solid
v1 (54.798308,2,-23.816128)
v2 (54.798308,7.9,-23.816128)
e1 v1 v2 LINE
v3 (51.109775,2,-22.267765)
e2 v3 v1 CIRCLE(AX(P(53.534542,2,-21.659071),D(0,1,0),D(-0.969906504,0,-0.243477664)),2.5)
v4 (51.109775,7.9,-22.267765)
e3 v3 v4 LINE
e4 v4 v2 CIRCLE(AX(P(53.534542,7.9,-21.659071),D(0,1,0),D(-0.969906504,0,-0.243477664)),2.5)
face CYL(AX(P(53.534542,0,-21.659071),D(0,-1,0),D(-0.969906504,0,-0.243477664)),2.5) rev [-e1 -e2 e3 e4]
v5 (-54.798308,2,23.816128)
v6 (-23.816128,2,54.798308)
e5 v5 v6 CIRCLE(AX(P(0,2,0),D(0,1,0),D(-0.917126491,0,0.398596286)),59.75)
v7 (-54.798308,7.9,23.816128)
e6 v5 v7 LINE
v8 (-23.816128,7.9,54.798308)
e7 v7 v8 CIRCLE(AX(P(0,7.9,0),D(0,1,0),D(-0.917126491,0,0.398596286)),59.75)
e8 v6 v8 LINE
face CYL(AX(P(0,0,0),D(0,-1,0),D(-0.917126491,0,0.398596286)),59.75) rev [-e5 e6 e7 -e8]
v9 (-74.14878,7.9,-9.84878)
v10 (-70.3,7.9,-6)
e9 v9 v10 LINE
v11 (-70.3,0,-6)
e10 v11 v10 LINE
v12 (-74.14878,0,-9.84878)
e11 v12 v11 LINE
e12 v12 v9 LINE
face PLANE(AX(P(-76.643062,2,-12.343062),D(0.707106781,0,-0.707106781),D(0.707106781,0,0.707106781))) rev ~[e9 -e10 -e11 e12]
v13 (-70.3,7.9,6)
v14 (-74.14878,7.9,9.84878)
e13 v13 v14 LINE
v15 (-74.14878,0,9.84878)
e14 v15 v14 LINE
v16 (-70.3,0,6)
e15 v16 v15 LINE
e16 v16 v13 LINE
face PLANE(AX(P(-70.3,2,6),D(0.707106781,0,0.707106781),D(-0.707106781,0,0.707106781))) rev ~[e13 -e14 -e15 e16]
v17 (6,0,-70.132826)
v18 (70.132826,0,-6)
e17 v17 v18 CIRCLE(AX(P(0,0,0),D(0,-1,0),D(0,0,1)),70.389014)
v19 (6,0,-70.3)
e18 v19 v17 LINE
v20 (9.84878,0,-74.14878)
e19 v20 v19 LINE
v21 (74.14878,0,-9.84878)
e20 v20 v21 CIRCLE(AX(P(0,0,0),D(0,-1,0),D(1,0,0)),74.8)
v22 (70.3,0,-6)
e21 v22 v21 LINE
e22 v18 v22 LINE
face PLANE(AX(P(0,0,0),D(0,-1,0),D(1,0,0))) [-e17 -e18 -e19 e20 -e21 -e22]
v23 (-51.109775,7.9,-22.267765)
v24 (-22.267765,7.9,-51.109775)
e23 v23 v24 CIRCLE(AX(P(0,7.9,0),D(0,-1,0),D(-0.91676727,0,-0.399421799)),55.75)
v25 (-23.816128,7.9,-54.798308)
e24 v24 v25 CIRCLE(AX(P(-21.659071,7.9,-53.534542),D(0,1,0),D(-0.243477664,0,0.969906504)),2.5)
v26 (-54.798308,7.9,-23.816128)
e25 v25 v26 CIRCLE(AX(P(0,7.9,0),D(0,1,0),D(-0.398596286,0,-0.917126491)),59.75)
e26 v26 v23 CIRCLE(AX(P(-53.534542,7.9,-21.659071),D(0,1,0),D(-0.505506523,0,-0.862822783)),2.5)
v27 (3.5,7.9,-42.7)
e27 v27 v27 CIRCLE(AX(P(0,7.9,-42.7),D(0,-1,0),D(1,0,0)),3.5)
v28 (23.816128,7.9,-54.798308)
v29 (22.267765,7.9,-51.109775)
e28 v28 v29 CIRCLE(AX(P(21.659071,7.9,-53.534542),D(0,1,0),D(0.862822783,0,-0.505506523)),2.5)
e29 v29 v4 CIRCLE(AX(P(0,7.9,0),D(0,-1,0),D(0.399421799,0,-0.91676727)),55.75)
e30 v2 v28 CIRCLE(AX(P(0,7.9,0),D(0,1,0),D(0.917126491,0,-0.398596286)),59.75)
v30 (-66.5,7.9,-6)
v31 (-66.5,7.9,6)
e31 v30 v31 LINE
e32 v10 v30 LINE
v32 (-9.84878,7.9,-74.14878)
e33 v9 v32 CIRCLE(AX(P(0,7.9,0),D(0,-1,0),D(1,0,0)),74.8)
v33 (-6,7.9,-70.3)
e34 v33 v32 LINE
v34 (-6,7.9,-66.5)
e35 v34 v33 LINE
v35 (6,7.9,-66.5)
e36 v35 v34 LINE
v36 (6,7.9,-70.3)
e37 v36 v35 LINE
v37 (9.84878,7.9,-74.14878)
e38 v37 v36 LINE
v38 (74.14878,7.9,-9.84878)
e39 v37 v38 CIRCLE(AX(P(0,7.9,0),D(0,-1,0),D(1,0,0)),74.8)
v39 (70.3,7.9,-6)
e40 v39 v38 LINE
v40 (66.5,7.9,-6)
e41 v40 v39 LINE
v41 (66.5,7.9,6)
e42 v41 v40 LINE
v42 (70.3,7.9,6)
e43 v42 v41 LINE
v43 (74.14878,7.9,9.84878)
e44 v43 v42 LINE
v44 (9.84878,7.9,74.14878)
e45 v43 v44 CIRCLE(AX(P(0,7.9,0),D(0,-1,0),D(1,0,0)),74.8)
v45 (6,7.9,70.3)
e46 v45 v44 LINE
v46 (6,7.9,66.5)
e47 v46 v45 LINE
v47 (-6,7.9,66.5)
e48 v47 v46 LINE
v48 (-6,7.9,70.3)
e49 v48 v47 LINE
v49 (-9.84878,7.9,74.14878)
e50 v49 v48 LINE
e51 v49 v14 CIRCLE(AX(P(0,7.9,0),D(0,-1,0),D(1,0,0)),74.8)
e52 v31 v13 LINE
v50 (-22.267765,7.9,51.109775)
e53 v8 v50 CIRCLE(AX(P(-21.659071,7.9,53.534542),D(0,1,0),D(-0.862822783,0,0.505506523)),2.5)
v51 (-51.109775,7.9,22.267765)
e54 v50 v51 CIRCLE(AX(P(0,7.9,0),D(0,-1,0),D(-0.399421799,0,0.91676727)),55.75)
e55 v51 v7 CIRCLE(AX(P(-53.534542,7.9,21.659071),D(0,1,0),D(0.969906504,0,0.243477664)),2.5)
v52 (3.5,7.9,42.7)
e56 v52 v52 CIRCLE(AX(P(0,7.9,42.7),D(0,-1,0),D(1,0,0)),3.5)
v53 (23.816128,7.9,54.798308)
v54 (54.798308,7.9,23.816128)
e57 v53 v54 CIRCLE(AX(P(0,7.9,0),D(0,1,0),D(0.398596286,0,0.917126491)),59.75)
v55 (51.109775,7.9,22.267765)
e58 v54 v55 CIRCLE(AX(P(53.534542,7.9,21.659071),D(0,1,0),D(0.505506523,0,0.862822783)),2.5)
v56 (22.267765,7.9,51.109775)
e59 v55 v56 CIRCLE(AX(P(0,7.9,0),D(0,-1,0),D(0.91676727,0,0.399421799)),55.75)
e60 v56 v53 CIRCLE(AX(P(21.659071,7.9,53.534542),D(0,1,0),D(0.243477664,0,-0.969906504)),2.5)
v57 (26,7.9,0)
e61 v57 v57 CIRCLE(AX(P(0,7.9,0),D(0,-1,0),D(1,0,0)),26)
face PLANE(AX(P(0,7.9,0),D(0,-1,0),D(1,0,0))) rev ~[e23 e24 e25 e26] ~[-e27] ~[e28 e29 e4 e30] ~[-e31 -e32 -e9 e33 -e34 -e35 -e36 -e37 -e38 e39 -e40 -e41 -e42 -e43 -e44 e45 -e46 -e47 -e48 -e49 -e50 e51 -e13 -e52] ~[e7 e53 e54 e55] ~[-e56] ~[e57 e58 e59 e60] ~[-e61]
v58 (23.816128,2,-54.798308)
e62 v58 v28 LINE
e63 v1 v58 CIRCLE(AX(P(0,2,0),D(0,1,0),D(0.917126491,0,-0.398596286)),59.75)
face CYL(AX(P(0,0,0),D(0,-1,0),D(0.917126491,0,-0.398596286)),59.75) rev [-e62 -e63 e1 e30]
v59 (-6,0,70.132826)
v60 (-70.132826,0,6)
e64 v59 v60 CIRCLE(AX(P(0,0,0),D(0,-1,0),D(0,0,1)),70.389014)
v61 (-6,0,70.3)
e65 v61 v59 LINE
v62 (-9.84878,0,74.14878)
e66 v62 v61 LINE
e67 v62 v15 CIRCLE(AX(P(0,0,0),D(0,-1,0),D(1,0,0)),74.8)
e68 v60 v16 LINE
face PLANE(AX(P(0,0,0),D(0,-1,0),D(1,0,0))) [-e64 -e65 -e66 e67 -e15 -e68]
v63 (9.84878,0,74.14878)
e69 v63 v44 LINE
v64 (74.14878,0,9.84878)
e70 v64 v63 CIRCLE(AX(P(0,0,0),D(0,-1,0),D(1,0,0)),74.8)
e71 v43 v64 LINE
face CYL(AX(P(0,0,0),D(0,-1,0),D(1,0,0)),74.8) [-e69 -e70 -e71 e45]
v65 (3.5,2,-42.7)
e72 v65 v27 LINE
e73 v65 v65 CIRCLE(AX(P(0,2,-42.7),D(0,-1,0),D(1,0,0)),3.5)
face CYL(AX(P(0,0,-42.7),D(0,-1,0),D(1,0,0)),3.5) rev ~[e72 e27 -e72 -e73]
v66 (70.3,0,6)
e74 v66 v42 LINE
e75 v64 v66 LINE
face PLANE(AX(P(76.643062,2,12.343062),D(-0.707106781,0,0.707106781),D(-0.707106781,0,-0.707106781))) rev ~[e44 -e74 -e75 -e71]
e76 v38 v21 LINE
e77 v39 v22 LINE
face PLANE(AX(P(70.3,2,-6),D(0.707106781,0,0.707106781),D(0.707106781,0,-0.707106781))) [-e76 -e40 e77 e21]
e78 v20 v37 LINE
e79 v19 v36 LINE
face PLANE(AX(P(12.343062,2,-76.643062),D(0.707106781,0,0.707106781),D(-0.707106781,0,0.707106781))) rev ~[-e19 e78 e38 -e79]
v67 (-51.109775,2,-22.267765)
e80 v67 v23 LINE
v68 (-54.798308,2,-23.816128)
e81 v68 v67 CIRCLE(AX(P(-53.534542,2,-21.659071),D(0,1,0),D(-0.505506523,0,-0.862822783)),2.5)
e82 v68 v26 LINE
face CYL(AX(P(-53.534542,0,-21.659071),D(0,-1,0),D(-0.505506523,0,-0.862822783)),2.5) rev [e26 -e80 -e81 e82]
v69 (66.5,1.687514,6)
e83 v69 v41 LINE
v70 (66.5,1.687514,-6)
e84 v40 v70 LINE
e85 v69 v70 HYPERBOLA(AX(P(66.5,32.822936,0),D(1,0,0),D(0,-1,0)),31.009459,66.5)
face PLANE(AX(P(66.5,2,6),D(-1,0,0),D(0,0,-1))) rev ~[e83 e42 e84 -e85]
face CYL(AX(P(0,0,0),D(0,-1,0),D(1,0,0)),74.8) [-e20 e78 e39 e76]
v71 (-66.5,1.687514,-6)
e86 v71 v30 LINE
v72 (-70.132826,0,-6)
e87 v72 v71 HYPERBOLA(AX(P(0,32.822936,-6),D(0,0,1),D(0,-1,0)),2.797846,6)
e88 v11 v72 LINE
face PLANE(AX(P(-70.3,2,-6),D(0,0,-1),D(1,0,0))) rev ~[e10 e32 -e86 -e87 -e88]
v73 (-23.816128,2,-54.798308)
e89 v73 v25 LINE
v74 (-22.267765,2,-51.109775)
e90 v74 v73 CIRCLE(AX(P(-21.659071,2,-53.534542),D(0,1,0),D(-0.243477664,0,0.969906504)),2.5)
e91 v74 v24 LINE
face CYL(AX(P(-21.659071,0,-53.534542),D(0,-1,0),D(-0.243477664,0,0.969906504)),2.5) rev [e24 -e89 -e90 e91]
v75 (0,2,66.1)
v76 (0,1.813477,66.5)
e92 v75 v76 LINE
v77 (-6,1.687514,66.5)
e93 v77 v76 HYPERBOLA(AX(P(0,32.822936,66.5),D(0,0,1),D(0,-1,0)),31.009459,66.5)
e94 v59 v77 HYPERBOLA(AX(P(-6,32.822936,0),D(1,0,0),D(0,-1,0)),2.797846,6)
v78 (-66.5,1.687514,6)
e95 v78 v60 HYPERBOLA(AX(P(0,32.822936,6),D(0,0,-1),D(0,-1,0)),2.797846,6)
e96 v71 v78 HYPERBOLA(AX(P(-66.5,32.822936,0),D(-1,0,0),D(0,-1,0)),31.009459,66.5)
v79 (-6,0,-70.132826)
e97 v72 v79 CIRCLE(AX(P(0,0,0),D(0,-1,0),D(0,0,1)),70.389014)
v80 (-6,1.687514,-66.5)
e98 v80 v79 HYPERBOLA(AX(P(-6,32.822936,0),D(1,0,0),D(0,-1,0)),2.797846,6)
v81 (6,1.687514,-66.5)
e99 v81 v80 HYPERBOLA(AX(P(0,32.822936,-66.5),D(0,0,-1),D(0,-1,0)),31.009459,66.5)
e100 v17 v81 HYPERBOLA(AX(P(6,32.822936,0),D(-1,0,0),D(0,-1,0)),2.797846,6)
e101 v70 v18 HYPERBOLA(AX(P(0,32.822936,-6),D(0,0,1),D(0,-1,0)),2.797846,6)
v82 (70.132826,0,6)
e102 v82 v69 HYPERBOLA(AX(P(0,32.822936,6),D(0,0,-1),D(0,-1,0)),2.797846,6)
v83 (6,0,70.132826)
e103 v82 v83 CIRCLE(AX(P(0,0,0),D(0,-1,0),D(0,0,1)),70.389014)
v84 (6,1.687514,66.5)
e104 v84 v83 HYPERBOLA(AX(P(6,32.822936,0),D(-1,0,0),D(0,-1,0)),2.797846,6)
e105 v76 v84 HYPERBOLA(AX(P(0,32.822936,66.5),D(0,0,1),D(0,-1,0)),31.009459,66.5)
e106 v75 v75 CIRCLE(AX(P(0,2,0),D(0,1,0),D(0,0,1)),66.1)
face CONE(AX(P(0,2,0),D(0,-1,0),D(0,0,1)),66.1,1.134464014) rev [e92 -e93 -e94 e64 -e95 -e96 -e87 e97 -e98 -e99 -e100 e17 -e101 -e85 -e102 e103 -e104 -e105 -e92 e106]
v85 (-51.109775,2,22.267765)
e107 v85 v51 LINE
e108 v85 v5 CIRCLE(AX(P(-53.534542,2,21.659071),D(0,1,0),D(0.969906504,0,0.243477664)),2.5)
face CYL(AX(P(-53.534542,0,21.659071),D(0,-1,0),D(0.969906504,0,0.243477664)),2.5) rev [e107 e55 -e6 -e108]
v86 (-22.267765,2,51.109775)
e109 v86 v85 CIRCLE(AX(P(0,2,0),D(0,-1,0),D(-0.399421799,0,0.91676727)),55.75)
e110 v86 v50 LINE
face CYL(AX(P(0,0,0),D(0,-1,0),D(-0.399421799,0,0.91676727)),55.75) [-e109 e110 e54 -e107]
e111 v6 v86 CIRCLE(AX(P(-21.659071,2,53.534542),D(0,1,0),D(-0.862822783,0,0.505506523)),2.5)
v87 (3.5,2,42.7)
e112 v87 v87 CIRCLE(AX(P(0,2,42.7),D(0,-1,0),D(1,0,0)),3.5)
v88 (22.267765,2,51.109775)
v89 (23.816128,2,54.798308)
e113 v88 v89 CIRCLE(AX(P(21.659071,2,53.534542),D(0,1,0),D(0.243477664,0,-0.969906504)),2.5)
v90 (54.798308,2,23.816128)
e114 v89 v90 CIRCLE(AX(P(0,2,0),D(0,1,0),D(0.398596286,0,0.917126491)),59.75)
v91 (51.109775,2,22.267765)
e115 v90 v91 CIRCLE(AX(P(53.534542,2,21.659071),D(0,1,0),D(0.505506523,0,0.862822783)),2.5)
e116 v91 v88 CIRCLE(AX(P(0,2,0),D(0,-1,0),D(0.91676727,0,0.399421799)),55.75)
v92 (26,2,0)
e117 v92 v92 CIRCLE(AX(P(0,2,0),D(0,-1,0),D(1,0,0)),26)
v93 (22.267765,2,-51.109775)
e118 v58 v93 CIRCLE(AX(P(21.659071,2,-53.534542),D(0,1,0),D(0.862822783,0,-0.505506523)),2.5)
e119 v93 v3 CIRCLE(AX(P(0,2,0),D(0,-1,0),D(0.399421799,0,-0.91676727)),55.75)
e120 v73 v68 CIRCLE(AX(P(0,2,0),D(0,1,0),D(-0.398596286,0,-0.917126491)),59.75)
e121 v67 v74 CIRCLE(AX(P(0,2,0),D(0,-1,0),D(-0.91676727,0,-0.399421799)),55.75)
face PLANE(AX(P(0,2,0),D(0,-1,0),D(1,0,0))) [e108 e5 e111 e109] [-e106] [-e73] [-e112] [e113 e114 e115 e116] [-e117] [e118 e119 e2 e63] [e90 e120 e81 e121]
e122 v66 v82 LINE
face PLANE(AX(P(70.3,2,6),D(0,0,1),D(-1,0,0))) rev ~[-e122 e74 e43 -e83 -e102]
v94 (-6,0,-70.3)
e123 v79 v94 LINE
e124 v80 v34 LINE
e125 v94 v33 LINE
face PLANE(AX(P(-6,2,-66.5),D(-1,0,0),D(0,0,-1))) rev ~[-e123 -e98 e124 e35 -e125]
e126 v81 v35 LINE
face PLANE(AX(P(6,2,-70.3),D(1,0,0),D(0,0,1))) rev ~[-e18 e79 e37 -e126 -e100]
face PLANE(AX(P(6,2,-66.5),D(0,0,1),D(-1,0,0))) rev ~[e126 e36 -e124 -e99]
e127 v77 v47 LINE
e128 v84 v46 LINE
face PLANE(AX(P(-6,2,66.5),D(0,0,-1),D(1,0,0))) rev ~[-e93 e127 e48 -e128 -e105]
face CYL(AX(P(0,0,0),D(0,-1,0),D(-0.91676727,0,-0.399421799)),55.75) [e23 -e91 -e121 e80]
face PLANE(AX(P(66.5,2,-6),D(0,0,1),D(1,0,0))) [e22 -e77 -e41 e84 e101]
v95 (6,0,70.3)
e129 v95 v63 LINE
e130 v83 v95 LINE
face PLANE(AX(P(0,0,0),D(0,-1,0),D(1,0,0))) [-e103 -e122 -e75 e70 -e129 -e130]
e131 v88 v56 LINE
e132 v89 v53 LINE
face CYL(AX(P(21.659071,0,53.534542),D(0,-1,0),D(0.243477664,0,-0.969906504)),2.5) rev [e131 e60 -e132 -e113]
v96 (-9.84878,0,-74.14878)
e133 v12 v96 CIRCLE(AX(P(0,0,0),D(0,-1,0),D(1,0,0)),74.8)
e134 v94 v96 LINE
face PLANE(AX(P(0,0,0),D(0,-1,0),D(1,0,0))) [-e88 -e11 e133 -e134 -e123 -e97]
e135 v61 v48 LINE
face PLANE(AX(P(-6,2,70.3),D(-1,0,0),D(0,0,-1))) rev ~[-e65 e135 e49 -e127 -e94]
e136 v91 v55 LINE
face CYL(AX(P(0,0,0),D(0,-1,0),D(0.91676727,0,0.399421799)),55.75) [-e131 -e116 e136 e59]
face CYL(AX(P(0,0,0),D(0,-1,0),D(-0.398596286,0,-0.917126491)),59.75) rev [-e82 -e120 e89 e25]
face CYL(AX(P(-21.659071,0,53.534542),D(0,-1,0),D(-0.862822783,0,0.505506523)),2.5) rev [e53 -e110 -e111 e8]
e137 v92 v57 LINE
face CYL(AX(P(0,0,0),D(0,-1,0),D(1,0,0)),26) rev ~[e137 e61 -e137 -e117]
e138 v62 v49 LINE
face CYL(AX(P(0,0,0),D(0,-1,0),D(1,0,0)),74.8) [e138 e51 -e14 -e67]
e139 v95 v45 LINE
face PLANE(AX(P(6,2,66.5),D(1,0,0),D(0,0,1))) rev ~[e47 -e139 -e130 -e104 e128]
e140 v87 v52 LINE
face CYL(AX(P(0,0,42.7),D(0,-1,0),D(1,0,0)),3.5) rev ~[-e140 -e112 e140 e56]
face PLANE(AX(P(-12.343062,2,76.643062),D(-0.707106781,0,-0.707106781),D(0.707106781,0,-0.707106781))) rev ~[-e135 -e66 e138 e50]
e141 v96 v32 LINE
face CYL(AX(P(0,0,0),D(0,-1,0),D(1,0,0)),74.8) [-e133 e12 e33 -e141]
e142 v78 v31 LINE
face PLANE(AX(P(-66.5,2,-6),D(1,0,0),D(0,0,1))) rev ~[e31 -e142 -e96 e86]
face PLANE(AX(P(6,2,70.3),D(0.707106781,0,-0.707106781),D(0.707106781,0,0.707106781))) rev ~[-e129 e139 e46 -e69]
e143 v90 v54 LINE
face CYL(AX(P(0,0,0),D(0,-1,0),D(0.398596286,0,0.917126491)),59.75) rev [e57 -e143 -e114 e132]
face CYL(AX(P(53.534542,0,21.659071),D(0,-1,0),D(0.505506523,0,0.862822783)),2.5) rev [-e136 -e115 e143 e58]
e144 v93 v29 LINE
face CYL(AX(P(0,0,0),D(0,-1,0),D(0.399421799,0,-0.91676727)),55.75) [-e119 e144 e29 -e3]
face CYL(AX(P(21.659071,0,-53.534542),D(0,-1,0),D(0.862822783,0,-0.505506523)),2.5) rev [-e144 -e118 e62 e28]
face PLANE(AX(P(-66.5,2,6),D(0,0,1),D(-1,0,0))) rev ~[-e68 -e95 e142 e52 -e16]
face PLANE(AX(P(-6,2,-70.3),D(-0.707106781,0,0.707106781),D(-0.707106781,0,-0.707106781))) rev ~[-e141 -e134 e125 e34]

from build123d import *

# Parameters (mm, degrees)
F0_R     = 74.8
F0_R_2   = 3.5
F0_R_3   = 26
F1_DEPTH = 7.9
F2_DEPTH = 7.9
F3_R     = 66.1
F3_R_2   = 3.5
F3_R_3   = 26
F4_DEPTH = 2
F8_DEPTH = 5.9
F9_DEPTH = 2


# Not quite as in the source:
# - a feature names something its author has since deleted; it is built from what else it names


with BuildPart() as f1:
    # F0 (on Front) → F1 (new body)
    with BuildSketch(Plane.XZ):
        Circle(F0_R)
        with BuildLine():
            ThreePointArc((-23.816128087, -54.7983078474), (-42.2496301759, -42.2496301759), (-54.7983078474, -23.816128087))
            ThreePointArc((-54.7983078474, -23.816128087), (-54.50218665, -19.353932752), (-51.1097752784, -22.2677652896))
            ThreePointArc((-51.1097752784, -22.2677652896), (-39.4212030512, -39.4212030512), (-22.2677652896, -51.1097752784))
            ThreePointArc((-22.2677652896, -51.1097752784), (-19.353932752, -54.50218665), (-23.816128087, -54.7983078474))
        make_face(mode=Mode.SUBTRACT)
        with Locations((0, -42.7)):
            Circle(F0_R_2, mode=Mode.SUBTRACT)
        Circle(F0_R_3, mode=Mode.SUBTRACT)
        with BuildLine():
            ThreePointArc((54.7983078474, -23.816128087), (42.2496301759, -42.2496301759), (23.816128087, -54.7983078474))
            ThreePointArc((23.816128087, -54.7983078474), (19.353932752, -54.50218665), (22.2677652896, -51.1097752784))
            ThreePointArc((22.2677652896, -51.1097752784), (39.4212030512, -39.4212030512), (51.1097752784, -22.2677652896))
            ThreePointArc((51.1097752784, -22.2677652896), (54.50218665, -19.353932752), (54.7983078474, -23.816128087))
        make_face(mode=Mode.SUBTRACT)
        with BuildLine():
            ThreePointArc((-54.7983078474, 23.816128087), (-42.2496301759, 42.2496301759), (-23.816128087, 54.7983078474))
            ThreePointArc((-23.816128087, 54.7983078474), (-19.353932752, 54.50218665), (-22.2677652896, 51.1097752784))
            ThreePointArc((-22.2677652896, 51.1097752784), (-39.4212030512, 39.4212030512), (-51.1097752784, 22.2677652896))
            ThreePointArc((-51.1097752784, 22.2677652896), (-54.50218665, 19.353932752), (-54.7983078474, 23.816128087))
        make_face(mode=Mode.SUBTRACT)
        with Locations((0, 42.7)):
            Circle(F0_R_2, mode=Mode.SUBTRACT)
        with BuildLine():
            ThreePointArc((54.7983078474, 23.816128087), (54.50218665, 19.353932752), (51.1097752784, 22.2677652896))
            ThreePointArc((51.1097752784, 22.2677652896), (39.4212030512, 39.4212030512), (22.2677652896, 51.1097752784))
            ThreePointArc((22.2677652896, 51.1097752784), (19.353932752, 54.50218665), (23.816128087, 54.7983078474))
            ThreePointArc((23.816128087, 54.7983078474), (42.2496301759, 42.2496301759), (54.7983078474, 23.816128087))
        make_face(mode=Mode.SUBTRACT)
        Circle(F0_R_3)
    extrude(amount=-F1_DEPTH)

    # F0 (on Front) → F2 (cut)
    with BuildSketch(Plane.XZ):
        Circle(F0_R_3)
    extrude(amount=-F2_DEPTH, mode=Mode.SUBTRACT)

    # F3 (on face) → F4 (cut)
    with BuildSketch(Plane.XZ):
        Circle(F3_R)
        with BuildLine():
            ThreePointArc((-22.2677652896, -51.1097752784), (-19.353932752, -54.50218665), (-23.816128087, -54.7983078474))
            ThreePointArc((-23.816128087, -54.7983078474), (-42.2496301759, -42.2496301759), (-54.7983078474, -23.816128087))
            ThreePointArc((-54.7983078474, -23.816128087), (-54.50218665, -19.353932752), (-51.1097752784, -22.2677652896))
            ThreePointArc((-51.1097752784, -22.2677652896), (-39.4212030512, -39.4212030512), (-22.2677652896, -51.1097752784))
        make_face(mode=Mode.SUBTRACT)
        with Locations((0, -42.7)):
            Circle(F3_R_2, mode=Mode.SUBTRACT)
        Circle(F3_R_3, mode=Mode.SUBTRACT)
        with BuildLine():
            ThreePointArc((51.1097752784, -22.2677652896), (54.50218665, -19.353932752), (54.7983078474, -23.816128087))
            ThreePointArc((54.7983078474, -23.816128087), (42.2496301759, -42.2496301759), (23.816128087, -54.7983078474))
            ThreePointArc((23.816128087, -54.7983078474), (19.353932752, -54.50218665), (22.2677652896, -51.1097752784))
            ThreePointArc((22.2677652896, -51.1097752784), (39.4212030512, -39.4212030512), (51.1097752784, -22.2677652896))
        make_face(mode=Mode.SUBTRACT)
        with BuildLine():
            ThreePointArc((-51.1097752784, 22.2677652896), (-54.50218665, 19.353932752), (-54.7983078474, 23.816128087))
            ThreePointArc((-54.7983078474, 23.816128087), (-42.2496301759, 42.2496301759), (-23.816128087, 54.7983078474))
            ThreePointArc((-23.816128087, 54.7983078474), (-19.353932752, 54.50218665), (-22.2677652896, 51.1097752784))
            ThreePointArc((-22.2677652896, 51.1097752784), (-39.4212030512, 39.4212030512), (-51.1097752784, 22.2677652896))
        make_face(mode=Mode.SUBTRACT)
        with Locations((0, 42.7)):
            Circle(F3_R_2, mode=Mode.SUBTRACT)
        with BuildLine():
            ThreePointArc((23.816128087, 54.7983078474), (42.2496301759, 42.2496301759), (54.7983078474, 23.816128087))
            ThreePointArc((54.7983078474, 23.816128087), (54.50218665, 19.353932752), (51.1097752784, 22.2677652896))
            ThreePointArc((51.1097752784, 22.2677652896), (39.4212030512, 39.4212030512), (22.2677652896, 51.1097752784))
            ThreePointArc((22.2677652896, 51.1097752784), (19.353932752, 54.50218665), (23.816128087, 54.7983078474))
        make_face(mode=Mode.SUBTRACT)
    extrude(amount=-F4_DEPTH, mode=Mode.SUBTRACT)

    # F5 (on Right) → F6 (revolve, cut)
    with BuildSketch(Plane.YZ):
        Polygon((-1.7160152132, 0), (2, 0), (2, 66.1), (-1.7160152132, 74.0690203414), align=None)
    revolve(axis=Axis((0, 0.1419923934, 0), (0, 1, 0)), mode=Mode.SUBTRACT)

    # F7 (on face) → F8 (cut)
    with BuildSketch(Plane.XZ.offset(-2)):
        Polygon((-6, 70.3), (-6, 66.5), (6, 66.5), (6, 70.3), (12.4951375847, 76.7951375847), (-12.3430622144, 76.6430622144), align=None)
        Polygon((-66.5, 6), (-70.3, 6), (-76.7951375847, 12.4951375847), (-76.6430622144, -12.3430622144), (-70.3, -6), (-66.5, -6), align=None)
        Polygon((-6, -66.5), (-6, -70.3), (-12.4951375847, -76.7951375847), (12.3430622144, -76.6430622144), (6, -70.3), (6, -66.5), align=None)
        Polygon((66.5, -6), (70.3, -6), (76.7951375847, -12.4951375847), (76.6430622144, 12.3430622144), (70.3, 6), (66.5, 6), align=None)
    extrude(amount=-F8_DEPTH, mode=Mode.SUBTRACT)

    # F9 (cut): faces of the model
    f9_faces = [f1.faces().sort_by_distance(p)[0] for p in [
        (0, 2, 70.9549233508),
        (0, 2, -70.9549233508),
        (-70.9549233508, 2, 0),
        (70.9549233508, 2, 0),
    ]]
    extrude(f9_faces, amount=-F9_DEPTH, mode=Mode.SUBTRACT)


solid = f1.part
